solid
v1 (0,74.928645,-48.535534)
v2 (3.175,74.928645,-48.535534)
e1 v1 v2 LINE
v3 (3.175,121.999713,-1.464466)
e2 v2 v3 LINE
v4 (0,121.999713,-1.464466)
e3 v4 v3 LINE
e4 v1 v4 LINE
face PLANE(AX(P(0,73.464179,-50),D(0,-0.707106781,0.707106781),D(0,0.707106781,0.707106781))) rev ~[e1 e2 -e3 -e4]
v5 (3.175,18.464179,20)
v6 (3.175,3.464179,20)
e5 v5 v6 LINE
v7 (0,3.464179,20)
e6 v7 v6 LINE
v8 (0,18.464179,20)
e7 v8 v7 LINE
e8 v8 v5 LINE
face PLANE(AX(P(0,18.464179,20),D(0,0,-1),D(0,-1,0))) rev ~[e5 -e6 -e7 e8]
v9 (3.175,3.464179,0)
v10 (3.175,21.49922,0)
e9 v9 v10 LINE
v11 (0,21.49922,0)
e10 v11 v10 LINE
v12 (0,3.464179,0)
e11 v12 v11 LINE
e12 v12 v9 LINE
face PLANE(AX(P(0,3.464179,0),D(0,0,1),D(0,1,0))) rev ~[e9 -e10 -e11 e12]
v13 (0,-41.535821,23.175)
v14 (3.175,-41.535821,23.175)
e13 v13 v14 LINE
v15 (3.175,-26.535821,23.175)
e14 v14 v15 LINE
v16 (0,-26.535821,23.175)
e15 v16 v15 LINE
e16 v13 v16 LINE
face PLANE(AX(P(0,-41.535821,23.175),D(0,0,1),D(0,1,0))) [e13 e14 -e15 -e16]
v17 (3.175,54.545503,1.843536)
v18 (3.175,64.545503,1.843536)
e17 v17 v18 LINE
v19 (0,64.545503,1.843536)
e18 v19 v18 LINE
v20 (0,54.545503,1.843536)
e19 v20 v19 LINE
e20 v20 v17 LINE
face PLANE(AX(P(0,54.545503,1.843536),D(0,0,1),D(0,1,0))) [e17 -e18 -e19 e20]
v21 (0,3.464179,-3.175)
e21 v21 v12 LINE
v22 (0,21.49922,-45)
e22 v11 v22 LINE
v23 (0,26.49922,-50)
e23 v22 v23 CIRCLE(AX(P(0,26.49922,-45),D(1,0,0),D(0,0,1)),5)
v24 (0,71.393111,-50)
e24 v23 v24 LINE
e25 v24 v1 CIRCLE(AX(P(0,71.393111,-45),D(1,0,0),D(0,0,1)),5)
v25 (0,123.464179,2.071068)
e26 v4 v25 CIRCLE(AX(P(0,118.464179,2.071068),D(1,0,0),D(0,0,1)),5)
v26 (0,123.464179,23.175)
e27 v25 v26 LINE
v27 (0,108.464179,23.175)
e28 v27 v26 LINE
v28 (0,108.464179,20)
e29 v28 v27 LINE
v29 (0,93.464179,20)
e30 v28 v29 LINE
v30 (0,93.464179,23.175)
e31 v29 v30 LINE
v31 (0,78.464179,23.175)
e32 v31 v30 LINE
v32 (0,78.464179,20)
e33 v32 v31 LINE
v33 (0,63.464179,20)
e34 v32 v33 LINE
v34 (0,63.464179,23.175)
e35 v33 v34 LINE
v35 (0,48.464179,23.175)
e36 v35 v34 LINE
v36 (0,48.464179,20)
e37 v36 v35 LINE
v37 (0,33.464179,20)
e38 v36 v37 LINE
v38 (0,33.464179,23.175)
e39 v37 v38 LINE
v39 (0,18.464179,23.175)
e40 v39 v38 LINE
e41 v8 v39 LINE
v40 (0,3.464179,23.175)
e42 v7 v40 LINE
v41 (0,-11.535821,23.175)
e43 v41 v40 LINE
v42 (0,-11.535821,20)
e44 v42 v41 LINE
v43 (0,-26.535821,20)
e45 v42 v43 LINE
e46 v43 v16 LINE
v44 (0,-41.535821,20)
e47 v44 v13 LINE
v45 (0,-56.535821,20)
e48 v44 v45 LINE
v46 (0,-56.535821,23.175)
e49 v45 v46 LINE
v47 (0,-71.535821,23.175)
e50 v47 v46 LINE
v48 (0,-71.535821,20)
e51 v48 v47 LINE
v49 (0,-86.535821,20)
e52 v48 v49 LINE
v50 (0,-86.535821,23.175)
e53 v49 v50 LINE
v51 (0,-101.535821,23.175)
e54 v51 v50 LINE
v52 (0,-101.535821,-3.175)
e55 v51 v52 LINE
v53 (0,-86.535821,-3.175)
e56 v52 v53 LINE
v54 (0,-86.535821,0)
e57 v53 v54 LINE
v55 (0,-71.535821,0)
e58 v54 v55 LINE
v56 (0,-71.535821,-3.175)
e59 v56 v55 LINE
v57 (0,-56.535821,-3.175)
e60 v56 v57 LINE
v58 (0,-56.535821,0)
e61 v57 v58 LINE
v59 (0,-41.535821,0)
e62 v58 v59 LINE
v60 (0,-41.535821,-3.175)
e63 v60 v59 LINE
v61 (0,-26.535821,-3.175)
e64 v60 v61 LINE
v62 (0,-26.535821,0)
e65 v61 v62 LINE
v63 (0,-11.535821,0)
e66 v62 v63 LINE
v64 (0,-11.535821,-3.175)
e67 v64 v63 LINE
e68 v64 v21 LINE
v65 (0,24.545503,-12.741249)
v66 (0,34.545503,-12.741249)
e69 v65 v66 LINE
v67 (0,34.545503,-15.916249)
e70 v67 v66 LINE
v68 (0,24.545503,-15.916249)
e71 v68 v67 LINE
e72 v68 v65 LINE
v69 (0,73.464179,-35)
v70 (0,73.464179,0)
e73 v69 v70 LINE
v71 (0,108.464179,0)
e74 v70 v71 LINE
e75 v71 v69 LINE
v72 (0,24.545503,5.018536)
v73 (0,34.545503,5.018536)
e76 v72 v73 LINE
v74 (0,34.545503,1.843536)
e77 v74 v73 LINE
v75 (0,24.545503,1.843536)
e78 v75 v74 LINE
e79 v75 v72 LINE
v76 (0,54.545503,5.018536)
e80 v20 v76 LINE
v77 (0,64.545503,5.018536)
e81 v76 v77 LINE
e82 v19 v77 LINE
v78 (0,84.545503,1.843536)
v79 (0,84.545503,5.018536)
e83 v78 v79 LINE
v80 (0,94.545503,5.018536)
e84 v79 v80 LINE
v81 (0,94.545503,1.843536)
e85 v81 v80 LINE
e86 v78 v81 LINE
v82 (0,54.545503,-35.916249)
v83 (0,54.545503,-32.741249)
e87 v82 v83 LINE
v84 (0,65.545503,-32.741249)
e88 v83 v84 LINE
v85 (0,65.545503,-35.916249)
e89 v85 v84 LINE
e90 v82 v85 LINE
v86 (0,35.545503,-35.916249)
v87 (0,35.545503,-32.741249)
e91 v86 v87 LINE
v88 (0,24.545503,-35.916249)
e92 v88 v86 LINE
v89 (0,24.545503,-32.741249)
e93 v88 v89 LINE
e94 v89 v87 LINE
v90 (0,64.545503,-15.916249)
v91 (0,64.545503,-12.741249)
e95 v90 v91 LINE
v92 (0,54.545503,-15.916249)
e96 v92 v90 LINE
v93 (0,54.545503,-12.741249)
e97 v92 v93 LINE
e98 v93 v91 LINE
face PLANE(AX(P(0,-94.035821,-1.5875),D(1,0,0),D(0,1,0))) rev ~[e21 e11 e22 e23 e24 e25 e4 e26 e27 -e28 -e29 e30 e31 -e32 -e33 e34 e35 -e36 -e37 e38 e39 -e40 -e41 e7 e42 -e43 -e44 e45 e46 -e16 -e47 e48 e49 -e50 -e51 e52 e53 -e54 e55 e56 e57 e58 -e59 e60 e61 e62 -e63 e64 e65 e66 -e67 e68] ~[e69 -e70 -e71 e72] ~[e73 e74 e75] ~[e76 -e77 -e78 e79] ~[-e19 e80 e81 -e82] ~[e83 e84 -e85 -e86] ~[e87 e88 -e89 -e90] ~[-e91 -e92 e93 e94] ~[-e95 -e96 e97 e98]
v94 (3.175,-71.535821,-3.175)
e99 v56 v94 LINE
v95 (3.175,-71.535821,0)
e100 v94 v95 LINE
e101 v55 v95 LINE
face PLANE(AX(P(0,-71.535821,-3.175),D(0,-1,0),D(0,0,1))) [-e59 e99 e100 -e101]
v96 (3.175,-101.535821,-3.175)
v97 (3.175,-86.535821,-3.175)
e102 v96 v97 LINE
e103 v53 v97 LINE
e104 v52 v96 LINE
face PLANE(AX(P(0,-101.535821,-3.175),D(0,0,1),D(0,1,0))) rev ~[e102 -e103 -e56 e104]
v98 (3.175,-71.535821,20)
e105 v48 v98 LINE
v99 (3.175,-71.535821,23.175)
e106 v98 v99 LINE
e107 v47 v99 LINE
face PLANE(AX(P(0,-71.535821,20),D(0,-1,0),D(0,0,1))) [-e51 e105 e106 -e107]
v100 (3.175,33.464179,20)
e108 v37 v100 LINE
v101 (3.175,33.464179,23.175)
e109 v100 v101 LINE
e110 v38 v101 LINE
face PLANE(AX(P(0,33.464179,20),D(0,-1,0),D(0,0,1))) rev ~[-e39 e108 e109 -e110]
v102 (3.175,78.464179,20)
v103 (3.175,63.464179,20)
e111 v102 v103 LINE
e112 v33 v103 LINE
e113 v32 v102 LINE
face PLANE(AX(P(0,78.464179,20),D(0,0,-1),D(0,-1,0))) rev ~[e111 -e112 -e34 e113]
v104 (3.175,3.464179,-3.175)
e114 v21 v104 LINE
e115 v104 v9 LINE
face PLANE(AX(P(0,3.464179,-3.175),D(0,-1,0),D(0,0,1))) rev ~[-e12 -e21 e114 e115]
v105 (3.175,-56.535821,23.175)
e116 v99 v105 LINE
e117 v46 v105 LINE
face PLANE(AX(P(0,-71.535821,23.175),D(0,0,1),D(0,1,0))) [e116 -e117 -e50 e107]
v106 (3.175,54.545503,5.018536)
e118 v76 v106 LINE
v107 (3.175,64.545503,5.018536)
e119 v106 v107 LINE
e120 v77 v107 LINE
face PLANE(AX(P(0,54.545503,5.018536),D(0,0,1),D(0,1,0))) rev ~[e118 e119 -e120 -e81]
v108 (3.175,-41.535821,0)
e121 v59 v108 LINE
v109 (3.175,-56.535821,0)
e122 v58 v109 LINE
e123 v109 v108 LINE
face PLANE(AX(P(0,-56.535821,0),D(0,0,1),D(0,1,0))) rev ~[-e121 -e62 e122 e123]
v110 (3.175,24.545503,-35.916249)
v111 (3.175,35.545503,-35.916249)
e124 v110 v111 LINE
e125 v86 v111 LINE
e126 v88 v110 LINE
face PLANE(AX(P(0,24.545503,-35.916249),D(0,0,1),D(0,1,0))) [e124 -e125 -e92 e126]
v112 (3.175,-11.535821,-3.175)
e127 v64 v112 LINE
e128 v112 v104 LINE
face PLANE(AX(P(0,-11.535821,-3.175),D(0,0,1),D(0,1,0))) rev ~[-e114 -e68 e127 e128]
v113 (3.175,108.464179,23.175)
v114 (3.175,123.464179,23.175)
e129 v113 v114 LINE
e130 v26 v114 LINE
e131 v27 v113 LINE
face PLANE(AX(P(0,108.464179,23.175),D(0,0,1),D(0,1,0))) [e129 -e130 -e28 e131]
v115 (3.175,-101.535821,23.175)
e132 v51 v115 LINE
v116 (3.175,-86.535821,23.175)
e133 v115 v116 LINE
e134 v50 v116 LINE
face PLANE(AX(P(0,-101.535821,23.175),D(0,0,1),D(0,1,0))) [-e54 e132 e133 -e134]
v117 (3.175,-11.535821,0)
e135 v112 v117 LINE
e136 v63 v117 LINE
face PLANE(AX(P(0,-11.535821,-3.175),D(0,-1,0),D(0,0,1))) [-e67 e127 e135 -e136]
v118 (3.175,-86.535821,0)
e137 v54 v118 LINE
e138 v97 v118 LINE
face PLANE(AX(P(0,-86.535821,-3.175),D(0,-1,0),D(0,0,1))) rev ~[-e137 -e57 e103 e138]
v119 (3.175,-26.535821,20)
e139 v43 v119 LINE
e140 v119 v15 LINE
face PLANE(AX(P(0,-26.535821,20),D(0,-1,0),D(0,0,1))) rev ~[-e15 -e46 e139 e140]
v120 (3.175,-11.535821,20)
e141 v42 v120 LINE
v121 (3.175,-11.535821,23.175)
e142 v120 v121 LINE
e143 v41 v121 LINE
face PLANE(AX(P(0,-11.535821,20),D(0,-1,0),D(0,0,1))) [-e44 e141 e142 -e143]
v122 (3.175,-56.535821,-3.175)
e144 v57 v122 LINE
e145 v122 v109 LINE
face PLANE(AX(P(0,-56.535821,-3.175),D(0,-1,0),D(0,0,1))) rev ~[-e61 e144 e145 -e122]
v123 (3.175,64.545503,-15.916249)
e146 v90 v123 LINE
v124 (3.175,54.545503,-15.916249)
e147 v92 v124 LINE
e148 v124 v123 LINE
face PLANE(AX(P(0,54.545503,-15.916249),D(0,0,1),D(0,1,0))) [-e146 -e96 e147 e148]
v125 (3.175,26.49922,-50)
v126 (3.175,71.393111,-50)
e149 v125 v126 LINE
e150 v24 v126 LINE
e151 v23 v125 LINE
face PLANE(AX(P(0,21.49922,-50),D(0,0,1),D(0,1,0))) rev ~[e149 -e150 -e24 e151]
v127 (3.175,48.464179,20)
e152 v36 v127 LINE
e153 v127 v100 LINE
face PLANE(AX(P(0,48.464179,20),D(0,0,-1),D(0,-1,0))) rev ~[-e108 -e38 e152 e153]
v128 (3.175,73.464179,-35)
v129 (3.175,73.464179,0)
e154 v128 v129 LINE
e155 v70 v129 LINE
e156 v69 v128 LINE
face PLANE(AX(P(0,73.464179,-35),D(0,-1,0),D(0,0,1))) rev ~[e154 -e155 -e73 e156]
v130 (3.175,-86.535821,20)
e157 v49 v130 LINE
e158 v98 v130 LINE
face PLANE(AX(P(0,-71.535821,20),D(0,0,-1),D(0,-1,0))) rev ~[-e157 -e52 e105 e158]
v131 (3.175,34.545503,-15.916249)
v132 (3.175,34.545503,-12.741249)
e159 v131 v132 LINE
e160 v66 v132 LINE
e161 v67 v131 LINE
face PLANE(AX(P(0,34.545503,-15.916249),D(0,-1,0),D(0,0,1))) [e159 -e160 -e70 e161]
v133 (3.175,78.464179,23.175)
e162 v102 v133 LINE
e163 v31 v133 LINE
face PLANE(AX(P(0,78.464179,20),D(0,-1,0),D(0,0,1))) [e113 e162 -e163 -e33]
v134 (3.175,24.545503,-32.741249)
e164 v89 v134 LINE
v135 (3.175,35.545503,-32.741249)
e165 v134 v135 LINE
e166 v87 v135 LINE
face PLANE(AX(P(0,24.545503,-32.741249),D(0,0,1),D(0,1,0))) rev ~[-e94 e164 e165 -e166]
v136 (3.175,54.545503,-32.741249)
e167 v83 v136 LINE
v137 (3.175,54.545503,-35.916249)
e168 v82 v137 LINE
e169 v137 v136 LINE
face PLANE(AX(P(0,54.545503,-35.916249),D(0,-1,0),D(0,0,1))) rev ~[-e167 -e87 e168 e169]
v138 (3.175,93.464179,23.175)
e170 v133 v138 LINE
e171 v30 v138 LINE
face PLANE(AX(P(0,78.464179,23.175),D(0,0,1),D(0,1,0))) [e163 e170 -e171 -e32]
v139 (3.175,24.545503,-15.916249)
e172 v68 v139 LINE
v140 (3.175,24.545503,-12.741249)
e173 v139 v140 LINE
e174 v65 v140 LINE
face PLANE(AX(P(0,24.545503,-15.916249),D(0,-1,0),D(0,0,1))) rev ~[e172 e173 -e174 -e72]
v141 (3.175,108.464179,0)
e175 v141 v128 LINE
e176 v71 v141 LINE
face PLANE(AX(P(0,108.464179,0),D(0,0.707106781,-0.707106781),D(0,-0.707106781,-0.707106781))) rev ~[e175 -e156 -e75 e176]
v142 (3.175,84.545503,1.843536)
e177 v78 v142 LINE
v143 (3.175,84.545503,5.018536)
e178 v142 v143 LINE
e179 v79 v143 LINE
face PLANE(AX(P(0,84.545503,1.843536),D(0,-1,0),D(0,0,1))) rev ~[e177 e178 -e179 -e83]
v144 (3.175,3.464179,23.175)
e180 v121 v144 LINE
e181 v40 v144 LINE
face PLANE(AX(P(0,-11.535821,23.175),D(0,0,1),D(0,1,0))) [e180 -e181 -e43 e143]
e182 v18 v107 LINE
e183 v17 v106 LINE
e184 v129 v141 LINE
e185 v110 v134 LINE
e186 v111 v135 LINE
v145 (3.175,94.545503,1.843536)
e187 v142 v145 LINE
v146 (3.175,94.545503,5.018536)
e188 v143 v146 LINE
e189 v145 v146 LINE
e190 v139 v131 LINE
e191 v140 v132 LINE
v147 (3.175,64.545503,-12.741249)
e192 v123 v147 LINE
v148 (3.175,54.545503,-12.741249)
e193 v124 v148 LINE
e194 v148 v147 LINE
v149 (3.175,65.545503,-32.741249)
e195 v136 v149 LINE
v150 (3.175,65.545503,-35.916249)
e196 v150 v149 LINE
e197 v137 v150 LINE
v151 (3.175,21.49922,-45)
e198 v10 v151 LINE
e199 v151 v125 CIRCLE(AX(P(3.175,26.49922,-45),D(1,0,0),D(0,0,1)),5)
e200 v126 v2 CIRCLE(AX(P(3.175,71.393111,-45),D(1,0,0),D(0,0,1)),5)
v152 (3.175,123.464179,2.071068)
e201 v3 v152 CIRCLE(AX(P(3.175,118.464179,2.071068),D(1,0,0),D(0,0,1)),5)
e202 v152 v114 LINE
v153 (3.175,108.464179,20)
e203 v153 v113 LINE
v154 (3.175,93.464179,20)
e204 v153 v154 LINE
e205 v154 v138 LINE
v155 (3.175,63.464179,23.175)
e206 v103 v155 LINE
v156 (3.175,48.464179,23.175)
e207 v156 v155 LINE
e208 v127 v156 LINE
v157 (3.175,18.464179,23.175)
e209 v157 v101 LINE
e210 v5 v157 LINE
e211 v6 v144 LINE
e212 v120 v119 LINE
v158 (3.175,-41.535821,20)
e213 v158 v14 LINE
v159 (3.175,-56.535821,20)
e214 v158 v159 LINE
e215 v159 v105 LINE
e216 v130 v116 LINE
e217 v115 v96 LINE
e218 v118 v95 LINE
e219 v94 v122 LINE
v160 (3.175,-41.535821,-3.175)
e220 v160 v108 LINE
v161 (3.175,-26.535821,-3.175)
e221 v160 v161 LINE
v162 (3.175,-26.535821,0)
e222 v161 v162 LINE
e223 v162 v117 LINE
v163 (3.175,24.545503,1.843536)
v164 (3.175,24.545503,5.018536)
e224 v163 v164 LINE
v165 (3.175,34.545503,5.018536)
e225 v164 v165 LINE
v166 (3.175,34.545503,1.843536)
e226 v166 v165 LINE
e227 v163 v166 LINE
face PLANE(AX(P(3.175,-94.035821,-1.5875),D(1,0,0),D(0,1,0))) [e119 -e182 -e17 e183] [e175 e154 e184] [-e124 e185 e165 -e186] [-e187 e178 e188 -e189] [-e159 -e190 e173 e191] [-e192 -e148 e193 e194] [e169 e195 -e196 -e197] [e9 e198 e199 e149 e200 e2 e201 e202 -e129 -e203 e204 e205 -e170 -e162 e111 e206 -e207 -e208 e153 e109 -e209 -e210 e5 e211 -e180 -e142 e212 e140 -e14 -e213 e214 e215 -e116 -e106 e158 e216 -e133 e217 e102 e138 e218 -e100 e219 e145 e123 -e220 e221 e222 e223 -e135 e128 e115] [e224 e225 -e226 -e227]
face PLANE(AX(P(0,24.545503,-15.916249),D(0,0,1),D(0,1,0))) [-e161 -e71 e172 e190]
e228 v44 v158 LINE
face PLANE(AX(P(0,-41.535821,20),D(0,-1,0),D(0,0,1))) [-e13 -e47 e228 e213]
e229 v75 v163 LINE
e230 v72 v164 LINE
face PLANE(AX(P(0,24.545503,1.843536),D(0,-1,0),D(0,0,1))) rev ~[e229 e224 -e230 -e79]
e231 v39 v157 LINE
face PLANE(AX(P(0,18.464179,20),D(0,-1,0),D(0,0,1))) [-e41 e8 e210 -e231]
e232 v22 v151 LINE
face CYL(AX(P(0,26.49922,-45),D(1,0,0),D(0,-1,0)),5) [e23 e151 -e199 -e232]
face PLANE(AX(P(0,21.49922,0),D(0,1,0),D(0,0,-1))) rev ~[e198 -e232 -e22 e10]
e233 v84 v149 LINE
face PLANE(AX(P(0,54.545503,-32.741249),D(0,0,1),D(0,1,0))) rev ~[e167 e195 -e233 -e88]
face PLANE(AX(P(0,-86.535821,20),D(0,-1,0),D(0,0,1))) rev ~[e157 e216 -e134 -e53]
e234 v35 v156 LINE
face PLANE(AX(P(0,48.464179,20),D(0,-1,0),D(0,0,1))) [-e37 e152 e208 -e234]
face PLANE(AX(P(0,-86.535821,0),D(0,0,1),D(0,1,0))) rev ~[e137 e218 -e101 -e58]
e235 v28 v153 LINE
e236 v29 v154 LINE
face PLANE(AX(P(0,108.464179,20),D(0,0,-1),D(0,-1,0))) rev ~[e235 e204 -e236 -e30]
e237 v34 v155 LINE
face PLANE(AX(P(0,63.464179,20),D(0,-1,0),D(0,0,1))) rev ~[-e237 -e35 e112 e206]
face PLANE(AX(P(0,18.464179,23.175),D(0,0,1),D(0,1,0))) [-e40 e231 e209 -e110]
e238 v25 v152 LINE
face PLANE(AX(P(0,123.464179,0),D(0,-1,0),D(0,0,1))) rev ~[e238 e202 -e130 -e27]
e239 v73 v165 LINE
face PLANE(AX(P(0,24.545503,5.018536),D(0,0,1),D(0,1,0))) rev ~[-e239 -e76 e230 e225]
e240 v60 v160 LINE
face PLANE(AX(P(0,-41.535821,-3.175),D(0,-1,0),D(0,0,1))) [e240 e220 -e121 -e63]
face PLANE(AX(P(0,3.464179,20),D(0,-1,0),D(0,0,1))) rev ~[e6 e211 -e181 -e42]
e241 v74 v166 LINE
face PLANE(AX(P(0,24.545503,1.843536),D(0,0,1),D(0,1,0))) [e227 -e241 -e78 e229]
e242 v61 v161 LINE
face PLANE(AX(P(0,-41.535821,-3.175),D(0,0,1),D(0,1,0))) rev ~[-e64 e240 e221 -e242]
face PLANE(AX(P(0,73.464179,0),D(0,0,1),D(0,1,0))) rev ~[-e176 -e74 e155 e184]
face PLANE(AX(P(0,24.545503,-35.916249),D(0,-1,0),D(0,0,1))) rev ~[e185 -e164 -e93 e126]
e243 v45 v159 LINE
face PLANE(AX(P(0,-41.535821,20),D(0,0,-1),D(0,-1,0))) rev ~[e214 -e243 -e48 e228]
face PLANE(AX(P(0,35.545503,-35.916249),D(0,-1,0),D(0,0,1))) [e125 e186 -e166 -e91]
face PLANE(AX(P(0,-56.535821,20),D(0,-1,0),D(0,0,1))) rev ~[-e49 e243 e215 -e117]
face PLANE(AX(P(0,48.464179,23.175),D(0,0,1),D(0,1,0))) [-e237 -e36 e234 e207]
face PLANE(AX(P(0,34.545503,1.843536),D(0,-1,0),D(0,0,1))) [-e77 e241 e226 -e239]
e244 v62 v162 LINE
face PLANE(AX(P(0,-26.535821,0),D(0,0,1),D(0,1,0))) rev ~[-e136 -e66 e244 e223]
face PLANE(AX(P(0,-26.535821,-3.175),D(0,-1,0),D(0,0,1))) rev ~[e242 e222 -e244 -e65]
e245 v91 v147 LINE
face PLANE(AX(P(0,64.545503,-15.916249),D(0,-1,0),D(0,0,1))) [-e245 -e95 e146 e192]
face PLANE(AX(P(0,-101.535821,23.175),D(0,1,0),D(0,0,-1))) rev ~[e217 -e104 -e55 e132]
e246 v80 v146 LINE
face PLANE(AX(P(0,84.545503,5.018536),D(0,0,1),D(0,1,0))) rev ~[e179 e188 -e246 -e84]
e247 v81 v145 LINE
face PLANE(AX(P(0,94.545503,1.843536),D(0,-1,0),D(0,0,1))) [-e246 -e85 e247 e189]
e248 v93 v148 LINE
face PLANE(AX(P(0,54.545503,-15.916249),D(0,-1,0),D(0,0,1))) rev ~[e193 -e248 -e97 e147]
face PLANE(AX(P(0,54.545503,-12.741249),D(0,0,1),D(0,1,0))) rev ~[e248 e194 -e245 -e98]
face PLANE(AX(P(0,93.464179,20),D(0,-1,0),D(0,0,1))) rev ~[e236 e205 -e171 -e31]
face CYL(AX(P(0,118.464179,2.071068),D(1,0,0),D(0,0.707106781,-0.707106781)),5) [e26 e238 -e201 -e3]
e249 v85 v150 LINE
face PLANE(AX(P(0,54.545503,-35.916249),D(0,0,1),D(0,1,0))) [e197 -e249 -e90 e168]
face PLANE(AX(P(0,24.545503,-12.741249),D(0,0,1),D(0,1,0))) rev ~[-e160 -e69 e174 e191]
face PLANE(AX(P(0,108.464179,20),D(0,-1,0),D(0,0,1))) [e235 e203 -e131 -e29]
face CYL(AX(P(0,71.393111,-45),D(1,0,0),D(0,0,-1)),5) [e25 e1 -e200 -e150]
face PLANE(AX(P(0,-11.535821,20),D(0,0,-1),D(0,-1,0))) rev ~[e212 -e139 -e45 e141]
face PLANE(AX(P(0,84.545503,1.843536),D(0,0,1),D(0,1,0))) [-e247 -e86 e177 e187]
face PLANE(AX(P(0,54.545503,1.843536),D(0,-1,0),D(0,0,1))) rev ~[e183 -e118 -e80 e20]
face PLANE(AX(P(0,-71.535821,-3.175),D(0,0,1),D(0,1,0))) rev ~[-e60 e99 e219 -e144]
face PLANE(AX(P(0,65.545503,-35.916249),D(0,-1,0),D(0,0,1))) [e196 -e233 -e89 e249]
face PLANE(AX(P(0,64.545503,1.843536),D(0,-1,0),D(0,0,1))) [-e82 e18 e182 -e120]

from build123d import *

# Parameters (mm, degrees)
F0_W     = 15
F0_H     = 3.175
F0_W_2   = 10
F0_W_3   = 11
F0_H_2   = 20
F1_DEPTH = 3.175
F2_R     = 5


# Not quite as in the source:
# - a feature names something its author has since deleted; it is built from what else it names


with BuildPart() as f1:
    # F0 (on Right) → F1 (new body)
    with BuildSketch(Plane.YZ):
        with Locations((-94.0358207209, -1.5875)):
            Rectangle(F0_W, F0_H)
        with Locations((-64.0358207209, -1.5875)):
            Rectangle(F0_W, F0_H)
        with Locations((-34.0358207209, -1.5875)):
            Rectangle(F0_W, F0_H)
        with Locations((-4.0358207209, -1.5875)):
            Rectangle(F0_W, F0_H)
        Polygon((-101.5358207209, 20), (-101.5358207209, 0), (-86.5358207209, 0), (-71.5358207209, 0), (-56.5358207209, 0), (-41.5358207209, 0), (-26.5358207209, 0), (-11.5358207209, 0), (3.4641792791, 0), (21.4992204921, 0), (38.0393435029, 0), (73.4641792791, 0), (108.4641792791, 0), (108.4641792791, 20), (93.4641792791, 20), (78.4641792791, 20), (63.4641792791, 20), (48.4641792791, 20), (33.4641792791, 20), (18.4641792791, 20), (3.4641792791, 20), (-11.5358207209, 20), (-26.5358207209, 20), (-41.5358207209, 20), (-56.5358207209, 20), (-71.5358207209, 20), (-86.5358207209, 20), align=None)
        with Locations((29.5455027372, 3.4310361944)):
            Rectangle(F0_W_2, F0_H, mode=Mode.SUBTRACT)
        with Locations((59.5455027372, 3.4310361944)):
            Rectangle(F0_W_2, F0_H, mode=Mode.SUBTRACT)
        with Locations((89.5455027372, 3.4310361944)):
            Rectangle(F0_W_2, F0_H, mode=Mode.SUBTRACT)
        Polygon((38.0393435029, 0), (21.4992204921, 0), (21.4992204921, -50), (73.4641792791, -50), (73.4641792791, -35), (73.4641792791, 0), align=None)
        with Locations((30.0455027372, -34.3287487835)):
            Rectangle(F0_W_3, F0_H, mode=Mode.SUBTRACT)
        with Locations((60.0455027372, -34.3287487835)):
            Rectangle(F0_W_3, F0_H, mode=Mode.SUBTRACT)
        with Locations((29.5455027372, -14.3287487835)):
            Rectangle(F0_W_2, F0_H, mode=Mode.SUBTRACT)
        with Locations((59.5455027372, -14.3287487835)):
            Rectangle(F0_W_2, F0_H, mode=Mode.SUBTRACT)
        with Locations((-94.0358207209, 21.5875)):
            Rectangle(F0_W, F0_H)
        with Locations((-64.0358207209, 21.5875)):
            Rectangle(F0_W, F0_H)
        with Locations((-34.0358207209, 21.5875)):
            Rectangle(F0_W, F0_H)
        with Locations((-4.0358207209, 21.5875)):
            Rectangle(F0_W, F0_H)
        with Locations((25.9641792791, 21.5875)):
            Rectangle(F0_W, F0_H)
        with Locations((55.9641792791, 21.5875)):
            Rectangle(F0_W, F0_H)
        with Locations((85.9641792791, 21.5875)):
            Rectangle(F0_W, F0_H)
        with Locations((115.9641792791, 21.5875)):
            Rectangle(F0_W, F0_H)
        with Locations((115.9641792791, 10)):
            Rectangle(F0_W, F0_H_2)
        Polygon((73.4641792791, -35), (73.4641792791, -50), (123.4641792791, 0), (108.4641792791, 0), align=None)
    extrude(amount=F1_DEPTH)

    # F2
    f2_edges = [f1.edges().sort_by_distance(p)[0] for p in [
        (1.5875, 123.464179, 0),
        (1.5875, 73.464179, -50),
        (1.5875, 21.49922, -50),
    ]]
    fillet(f2_edges, radius=F2_R)


solid = f1.part
